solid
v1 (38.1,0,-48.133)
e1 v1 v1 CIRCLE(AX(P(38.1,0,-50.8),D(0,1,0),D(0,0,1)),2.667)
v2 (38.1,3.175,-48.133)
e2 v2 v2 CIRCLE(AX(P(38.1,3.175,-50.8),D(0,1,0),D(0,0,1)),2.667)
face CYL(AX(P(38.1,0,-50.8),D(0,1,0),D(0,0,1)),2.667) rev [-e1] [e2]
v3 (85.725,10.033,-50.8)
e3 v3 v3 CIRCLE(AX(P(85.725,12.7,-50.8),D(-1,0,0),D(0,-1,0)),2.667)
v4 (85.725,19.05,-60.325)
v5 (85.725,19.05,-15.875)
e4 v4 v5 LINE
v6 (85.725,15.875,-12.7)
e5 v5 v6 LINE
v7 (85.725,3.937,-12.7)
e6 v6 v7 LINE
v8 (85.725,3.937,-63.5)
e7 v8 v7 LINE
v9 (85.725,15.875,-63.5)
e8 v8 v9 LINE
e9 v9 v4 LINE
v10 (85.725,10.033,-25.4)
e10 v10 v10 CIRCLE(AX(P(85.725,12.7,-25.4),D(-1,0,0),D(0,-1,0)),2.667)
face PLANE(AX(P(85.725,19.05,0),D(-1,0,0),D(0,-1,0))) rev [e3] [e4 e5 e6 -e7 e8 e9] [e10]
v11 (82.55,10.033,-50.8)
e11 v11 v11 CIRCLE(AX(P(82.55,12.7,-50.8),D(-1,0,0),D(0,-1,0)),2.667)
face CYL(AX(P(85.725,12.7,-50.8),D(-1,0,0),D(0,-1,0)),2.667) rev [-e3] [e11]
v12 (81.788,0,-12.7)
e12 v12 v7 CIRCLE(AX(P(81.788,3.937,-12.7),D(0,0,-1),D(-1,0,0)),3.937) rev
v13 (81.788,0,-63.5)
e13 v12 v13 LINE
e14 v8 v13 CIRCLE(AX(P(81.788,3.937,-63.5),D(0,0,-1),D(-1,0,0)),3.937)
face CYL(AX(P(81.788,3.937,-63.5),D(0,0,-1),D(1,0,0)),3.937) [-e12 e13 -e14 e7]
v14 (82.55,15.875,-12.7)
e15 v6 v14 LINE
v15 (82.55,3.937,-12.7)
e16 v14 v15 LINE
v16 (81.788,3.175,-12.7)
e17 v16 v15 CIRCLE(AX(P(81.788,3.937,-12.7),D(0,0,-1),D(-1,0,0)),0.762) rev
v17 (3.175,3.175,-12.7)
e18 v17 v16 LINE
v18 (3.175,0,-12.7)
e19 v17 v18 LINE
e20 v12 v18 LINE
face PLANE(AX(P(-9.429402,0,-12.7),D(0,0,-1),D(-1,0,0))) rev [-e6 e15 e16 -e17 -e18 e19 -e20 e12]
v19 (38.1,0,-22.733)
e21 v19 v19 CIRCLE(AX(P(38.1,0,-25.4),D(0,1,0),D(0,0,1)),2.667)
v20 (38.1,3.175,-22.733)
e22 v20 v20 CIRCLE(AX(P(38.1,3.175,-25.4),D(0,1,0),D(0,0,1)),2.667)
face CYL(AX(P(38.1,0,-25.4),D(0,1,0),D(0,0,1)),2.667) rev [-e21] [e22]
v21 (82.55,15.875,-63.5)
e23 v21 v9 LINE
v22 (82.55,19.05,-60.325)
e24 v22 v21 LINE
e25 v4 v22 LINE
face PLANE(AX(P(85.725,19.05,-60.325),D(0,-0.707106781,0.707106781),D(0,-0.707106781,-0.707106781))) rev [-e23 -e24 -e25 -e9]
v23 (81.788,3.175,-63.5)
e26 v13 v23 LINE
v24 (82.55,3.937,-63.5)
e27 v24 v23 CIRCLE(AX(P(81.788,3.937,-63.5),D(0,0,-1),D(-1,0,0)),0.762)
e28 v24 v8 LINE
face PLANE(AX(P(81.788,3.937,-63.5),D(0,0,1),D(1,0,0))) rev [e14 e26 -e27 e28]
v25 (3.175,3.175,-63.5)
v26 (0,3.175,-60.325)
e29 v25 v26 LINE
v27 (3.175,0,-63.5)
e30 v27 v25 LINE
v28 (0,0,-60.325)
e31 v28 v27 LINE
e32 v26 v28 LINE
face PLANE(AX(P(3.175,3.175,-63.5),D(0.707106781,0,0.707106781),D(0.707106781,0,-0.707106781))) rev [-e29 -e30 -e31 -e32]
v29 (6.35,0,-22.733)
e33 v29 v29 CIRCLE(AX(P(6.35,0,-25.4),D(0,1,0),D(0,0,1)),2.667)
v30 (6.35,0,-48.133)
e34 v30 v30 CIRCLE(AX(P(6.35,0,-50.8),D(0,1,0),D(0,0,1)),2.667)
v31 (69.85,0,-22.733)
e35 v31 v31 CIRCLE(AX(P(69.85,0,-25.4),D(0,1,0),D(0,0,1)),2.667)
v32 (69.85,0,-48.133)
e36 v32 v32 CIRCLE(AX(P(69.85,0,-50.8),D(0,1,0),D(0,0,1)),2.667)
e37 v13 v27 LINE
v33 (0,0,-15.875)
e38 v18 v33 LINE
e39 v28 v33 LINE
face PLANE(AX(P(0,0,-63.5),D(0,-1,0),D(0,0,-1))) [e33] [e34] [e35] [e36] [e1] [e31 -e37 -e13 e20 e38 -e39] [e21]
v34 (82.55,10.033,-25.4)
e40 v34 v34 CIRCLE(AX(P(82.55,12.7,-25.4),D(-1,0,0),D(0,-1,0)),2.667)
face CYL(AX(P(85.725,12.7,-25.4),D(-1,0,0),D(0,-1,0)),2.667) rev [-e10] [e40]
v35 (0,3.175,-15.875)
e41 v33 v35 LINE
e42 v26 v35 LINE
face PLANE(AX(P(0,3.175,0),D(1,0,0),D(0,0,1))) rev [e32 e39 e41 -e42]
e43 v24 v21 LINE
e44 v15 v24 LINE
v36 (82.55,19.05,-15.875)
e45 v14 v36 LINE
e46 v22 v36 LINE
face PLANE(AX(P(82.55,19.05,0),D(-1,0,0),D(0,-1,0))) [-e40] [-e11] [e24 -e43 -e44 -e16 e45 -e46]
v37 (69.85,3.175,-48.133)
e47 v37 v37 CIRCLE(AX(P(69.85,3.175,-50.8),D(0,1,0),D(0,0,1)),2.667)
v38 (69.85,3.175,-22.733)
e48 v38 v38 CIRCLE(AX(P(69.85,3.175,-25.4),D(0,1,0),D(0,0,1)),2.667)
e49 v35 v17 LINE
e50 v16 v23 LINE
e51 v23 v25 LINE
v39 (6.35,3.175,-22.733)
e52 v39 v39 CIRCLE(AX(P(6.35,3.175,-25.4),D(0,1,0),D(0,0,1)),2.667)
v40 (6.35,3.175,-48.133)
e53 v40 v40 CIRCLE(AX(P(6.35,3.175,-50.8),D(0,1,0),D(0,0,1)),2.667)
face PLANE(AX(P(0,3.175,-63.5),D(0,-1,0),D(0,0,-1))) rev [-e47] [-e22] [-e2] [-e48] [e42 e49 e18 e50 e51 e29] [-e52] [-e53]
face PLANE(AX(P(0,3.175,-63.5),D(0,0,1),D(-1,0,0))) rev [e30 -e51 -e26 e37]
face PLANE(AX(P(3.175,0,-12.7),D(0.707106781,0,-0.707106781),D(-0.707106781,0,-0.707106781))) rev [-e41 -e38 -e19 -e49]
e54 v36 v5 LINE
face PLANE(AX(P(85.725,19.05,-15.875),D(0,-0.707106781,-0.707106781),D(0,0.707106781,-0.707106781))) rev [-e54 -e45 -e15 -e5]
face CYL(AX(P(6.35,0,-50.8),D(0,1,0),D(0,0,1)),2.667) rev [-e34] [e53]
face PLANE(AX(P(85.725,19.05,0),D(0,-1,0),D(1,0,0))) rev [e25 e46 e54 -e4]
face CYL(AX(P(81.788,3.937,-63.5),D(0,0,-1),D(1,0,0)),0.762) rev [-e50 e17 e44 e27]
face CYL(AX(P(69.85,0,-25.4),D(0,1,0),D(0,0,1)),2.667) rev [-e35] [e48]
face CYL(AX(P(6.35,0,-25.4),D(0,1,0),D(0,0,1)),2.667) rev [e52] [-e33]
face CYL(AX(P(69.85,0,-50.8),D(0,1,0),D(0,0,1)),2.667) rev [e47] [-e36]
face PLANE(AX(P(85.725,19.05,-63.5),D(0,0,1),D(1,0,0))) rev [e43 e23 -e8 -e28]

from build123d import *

# Parameters (mm, degrees)
SKETCH1_W               = 81.788
SKETCH1_H               = 63.5
BOSS_EXTRUDE1_DEPTH     = 3.175
EDGE_FLANGE1_DEPTH      = 63.5
SKETCH6_R               = 2.667
CUT_EXTRUDE1_DEPTH      = 108.856577222
SKETCH7_R               = 2.667
CUT_EXTRUDE2_DEPTH      = 106.875658203
CUT_EXTRUDE3_DEPTH      = 108.856577222
CUT_EXTRUDE3_DEPTH_BACK = 108.856577222
SKETCH8_W               = 104.248957023
SKETCH8_H               = 23.686680931
CHAMFER2_SIZE           = 3.175


# Sheet-metal steps are written as plain solids
with BuildPart() as part:
    # Sketch1 → Boss-Extrude1 (new body)
    with BuildSketch(Plane(origin=(0, 0, 0), x_dir=(1, 0, 0), z_dir=(0, 1, 0))):
        with Locations((40.894, 31.75)):
            Rectangle(SKETCH1_W, SKETCH1_H)
    extrude(amount=BOSS_EXTRUDE1_DEPTH)

    # Edge-Flange1 section (across the edge) → Edge-Flange1 (add)
    with BuildSketch(Plane(origin=(82.55, 3.175, 0), x_dir=(-1, 0, 0), z_dir=(0, 0, -1))):
        with BuildLine():
            Line((-3.175, 0.762), (-3.175, 15.875))
            Line((-3.175, 15.875), (0, 15.875))
            Line((0, 15.875), (0, 0.762))
            ThreePointArc((0, 0.762), (0.223184633, 0.223184633), (0.762, 0))
            Line((0.762, 0), (0.762, -3.175))
            ThreePointArc((0.762, -3.175), (-2.021879398, -2.021879398), (-3.175, 0.762))
        make_face()
    extrude(amount=EDGE_FLANGE1_DEPTH)

    # Sketch6 → Cut-Extrude1 (cut, through all)
    with BuildSketch(Plane(origin=(0, 3.175, 0), x_dir=(1, 0, 0), z_dir=(0, 1, 0))):
        with Locations(Location((6.35, 50.8, 0), (0, 0, 270))):
            Circle(SKETCH6_R)
        with Locations(Location((6.35, 25.4, 0), (0, 0, 270))):
            Circle(SKETCH6_R)
        with Locations((6.35, 0)):
            Circle(SKETCH6_R)
        with Locations(Location((69.85, 50.8, 0), (0, 0, 270))):
            Circle(SKETCH6_R)
        with Locations(Location((69.85, 25.4, 0), (0, 0, 270))):
            Circle(SKETCH6_R)
        with Locations((69.85, 0)):
            Circle(SKETCH6_R)
        with Locations(Location((38.1, 50.8, 0), (0, 0, 270))):
            Circle(SKETCH6_R)
        with Locations((38.1, 0)):
            Circle(SKETCH6_R)
        with Locations(Location((38.1, 25.4, 0), (0, 0, 270))):
            Circle(SKETCH6_R)
    extrude(amount=-CUT_EXTRUDE1_DEPTH, mode=Mode.SUBTRACT)

    # Sketch7 → Cut-Extrude2 (cut, through all)
    with BuildSketch(Plane.ZY.offset(-82.55)):
        with Locations(Location((-50.8, 12.7, 0), (0, 0, 270))):
            Circle(SKETCH7_R)
        with Locations(Location((-25.4, 12.7, 0), (0, 0, 270))):
            Circle(SKETCH7_R)
        with Locations((0, 12.7)):
            Circle(SKETCH7_R)
    extrude(amount=-CUT_EXTRUDE2_DEPTH, mode=Mode.SUBTRACT)

    # Sketch8 → Cut-Extrude3 (cut, two sides: drawn at the far end of the back side and taken through both)
    with BuildSketch(Plane(origin=(0, 3.175, 0), x_dir=(1, 0, 0), z_dir=(0, 1, 0)).offset(-CUT_EXTRUDE3_DEPTH_BACK)):
        with Locations((42.695076622, 0.856659535)):
            Rectangle(SKETCH8_W, SKETCH8_H)
    extrude(amount=CUT_EXTRUDE3_DEPTH + CUT_EXTRUDE3_DEPTH_BACK, mode=Mode.SUBTRACT)

    # Chamfer2
    chamfer2_edges = [part.edges().sort_by_distance(p)[0] for p in [
        (84.1375, 19.05, -12.7),
        (0, 1.5875, -12.7),
        (84.1375, 19.05, -63.5),
        (0, 1.5875, -63.5),
    ]]
    chamfer(chamfer2_edges, length=CHAMFER2_SIZE)


solid = part.part
